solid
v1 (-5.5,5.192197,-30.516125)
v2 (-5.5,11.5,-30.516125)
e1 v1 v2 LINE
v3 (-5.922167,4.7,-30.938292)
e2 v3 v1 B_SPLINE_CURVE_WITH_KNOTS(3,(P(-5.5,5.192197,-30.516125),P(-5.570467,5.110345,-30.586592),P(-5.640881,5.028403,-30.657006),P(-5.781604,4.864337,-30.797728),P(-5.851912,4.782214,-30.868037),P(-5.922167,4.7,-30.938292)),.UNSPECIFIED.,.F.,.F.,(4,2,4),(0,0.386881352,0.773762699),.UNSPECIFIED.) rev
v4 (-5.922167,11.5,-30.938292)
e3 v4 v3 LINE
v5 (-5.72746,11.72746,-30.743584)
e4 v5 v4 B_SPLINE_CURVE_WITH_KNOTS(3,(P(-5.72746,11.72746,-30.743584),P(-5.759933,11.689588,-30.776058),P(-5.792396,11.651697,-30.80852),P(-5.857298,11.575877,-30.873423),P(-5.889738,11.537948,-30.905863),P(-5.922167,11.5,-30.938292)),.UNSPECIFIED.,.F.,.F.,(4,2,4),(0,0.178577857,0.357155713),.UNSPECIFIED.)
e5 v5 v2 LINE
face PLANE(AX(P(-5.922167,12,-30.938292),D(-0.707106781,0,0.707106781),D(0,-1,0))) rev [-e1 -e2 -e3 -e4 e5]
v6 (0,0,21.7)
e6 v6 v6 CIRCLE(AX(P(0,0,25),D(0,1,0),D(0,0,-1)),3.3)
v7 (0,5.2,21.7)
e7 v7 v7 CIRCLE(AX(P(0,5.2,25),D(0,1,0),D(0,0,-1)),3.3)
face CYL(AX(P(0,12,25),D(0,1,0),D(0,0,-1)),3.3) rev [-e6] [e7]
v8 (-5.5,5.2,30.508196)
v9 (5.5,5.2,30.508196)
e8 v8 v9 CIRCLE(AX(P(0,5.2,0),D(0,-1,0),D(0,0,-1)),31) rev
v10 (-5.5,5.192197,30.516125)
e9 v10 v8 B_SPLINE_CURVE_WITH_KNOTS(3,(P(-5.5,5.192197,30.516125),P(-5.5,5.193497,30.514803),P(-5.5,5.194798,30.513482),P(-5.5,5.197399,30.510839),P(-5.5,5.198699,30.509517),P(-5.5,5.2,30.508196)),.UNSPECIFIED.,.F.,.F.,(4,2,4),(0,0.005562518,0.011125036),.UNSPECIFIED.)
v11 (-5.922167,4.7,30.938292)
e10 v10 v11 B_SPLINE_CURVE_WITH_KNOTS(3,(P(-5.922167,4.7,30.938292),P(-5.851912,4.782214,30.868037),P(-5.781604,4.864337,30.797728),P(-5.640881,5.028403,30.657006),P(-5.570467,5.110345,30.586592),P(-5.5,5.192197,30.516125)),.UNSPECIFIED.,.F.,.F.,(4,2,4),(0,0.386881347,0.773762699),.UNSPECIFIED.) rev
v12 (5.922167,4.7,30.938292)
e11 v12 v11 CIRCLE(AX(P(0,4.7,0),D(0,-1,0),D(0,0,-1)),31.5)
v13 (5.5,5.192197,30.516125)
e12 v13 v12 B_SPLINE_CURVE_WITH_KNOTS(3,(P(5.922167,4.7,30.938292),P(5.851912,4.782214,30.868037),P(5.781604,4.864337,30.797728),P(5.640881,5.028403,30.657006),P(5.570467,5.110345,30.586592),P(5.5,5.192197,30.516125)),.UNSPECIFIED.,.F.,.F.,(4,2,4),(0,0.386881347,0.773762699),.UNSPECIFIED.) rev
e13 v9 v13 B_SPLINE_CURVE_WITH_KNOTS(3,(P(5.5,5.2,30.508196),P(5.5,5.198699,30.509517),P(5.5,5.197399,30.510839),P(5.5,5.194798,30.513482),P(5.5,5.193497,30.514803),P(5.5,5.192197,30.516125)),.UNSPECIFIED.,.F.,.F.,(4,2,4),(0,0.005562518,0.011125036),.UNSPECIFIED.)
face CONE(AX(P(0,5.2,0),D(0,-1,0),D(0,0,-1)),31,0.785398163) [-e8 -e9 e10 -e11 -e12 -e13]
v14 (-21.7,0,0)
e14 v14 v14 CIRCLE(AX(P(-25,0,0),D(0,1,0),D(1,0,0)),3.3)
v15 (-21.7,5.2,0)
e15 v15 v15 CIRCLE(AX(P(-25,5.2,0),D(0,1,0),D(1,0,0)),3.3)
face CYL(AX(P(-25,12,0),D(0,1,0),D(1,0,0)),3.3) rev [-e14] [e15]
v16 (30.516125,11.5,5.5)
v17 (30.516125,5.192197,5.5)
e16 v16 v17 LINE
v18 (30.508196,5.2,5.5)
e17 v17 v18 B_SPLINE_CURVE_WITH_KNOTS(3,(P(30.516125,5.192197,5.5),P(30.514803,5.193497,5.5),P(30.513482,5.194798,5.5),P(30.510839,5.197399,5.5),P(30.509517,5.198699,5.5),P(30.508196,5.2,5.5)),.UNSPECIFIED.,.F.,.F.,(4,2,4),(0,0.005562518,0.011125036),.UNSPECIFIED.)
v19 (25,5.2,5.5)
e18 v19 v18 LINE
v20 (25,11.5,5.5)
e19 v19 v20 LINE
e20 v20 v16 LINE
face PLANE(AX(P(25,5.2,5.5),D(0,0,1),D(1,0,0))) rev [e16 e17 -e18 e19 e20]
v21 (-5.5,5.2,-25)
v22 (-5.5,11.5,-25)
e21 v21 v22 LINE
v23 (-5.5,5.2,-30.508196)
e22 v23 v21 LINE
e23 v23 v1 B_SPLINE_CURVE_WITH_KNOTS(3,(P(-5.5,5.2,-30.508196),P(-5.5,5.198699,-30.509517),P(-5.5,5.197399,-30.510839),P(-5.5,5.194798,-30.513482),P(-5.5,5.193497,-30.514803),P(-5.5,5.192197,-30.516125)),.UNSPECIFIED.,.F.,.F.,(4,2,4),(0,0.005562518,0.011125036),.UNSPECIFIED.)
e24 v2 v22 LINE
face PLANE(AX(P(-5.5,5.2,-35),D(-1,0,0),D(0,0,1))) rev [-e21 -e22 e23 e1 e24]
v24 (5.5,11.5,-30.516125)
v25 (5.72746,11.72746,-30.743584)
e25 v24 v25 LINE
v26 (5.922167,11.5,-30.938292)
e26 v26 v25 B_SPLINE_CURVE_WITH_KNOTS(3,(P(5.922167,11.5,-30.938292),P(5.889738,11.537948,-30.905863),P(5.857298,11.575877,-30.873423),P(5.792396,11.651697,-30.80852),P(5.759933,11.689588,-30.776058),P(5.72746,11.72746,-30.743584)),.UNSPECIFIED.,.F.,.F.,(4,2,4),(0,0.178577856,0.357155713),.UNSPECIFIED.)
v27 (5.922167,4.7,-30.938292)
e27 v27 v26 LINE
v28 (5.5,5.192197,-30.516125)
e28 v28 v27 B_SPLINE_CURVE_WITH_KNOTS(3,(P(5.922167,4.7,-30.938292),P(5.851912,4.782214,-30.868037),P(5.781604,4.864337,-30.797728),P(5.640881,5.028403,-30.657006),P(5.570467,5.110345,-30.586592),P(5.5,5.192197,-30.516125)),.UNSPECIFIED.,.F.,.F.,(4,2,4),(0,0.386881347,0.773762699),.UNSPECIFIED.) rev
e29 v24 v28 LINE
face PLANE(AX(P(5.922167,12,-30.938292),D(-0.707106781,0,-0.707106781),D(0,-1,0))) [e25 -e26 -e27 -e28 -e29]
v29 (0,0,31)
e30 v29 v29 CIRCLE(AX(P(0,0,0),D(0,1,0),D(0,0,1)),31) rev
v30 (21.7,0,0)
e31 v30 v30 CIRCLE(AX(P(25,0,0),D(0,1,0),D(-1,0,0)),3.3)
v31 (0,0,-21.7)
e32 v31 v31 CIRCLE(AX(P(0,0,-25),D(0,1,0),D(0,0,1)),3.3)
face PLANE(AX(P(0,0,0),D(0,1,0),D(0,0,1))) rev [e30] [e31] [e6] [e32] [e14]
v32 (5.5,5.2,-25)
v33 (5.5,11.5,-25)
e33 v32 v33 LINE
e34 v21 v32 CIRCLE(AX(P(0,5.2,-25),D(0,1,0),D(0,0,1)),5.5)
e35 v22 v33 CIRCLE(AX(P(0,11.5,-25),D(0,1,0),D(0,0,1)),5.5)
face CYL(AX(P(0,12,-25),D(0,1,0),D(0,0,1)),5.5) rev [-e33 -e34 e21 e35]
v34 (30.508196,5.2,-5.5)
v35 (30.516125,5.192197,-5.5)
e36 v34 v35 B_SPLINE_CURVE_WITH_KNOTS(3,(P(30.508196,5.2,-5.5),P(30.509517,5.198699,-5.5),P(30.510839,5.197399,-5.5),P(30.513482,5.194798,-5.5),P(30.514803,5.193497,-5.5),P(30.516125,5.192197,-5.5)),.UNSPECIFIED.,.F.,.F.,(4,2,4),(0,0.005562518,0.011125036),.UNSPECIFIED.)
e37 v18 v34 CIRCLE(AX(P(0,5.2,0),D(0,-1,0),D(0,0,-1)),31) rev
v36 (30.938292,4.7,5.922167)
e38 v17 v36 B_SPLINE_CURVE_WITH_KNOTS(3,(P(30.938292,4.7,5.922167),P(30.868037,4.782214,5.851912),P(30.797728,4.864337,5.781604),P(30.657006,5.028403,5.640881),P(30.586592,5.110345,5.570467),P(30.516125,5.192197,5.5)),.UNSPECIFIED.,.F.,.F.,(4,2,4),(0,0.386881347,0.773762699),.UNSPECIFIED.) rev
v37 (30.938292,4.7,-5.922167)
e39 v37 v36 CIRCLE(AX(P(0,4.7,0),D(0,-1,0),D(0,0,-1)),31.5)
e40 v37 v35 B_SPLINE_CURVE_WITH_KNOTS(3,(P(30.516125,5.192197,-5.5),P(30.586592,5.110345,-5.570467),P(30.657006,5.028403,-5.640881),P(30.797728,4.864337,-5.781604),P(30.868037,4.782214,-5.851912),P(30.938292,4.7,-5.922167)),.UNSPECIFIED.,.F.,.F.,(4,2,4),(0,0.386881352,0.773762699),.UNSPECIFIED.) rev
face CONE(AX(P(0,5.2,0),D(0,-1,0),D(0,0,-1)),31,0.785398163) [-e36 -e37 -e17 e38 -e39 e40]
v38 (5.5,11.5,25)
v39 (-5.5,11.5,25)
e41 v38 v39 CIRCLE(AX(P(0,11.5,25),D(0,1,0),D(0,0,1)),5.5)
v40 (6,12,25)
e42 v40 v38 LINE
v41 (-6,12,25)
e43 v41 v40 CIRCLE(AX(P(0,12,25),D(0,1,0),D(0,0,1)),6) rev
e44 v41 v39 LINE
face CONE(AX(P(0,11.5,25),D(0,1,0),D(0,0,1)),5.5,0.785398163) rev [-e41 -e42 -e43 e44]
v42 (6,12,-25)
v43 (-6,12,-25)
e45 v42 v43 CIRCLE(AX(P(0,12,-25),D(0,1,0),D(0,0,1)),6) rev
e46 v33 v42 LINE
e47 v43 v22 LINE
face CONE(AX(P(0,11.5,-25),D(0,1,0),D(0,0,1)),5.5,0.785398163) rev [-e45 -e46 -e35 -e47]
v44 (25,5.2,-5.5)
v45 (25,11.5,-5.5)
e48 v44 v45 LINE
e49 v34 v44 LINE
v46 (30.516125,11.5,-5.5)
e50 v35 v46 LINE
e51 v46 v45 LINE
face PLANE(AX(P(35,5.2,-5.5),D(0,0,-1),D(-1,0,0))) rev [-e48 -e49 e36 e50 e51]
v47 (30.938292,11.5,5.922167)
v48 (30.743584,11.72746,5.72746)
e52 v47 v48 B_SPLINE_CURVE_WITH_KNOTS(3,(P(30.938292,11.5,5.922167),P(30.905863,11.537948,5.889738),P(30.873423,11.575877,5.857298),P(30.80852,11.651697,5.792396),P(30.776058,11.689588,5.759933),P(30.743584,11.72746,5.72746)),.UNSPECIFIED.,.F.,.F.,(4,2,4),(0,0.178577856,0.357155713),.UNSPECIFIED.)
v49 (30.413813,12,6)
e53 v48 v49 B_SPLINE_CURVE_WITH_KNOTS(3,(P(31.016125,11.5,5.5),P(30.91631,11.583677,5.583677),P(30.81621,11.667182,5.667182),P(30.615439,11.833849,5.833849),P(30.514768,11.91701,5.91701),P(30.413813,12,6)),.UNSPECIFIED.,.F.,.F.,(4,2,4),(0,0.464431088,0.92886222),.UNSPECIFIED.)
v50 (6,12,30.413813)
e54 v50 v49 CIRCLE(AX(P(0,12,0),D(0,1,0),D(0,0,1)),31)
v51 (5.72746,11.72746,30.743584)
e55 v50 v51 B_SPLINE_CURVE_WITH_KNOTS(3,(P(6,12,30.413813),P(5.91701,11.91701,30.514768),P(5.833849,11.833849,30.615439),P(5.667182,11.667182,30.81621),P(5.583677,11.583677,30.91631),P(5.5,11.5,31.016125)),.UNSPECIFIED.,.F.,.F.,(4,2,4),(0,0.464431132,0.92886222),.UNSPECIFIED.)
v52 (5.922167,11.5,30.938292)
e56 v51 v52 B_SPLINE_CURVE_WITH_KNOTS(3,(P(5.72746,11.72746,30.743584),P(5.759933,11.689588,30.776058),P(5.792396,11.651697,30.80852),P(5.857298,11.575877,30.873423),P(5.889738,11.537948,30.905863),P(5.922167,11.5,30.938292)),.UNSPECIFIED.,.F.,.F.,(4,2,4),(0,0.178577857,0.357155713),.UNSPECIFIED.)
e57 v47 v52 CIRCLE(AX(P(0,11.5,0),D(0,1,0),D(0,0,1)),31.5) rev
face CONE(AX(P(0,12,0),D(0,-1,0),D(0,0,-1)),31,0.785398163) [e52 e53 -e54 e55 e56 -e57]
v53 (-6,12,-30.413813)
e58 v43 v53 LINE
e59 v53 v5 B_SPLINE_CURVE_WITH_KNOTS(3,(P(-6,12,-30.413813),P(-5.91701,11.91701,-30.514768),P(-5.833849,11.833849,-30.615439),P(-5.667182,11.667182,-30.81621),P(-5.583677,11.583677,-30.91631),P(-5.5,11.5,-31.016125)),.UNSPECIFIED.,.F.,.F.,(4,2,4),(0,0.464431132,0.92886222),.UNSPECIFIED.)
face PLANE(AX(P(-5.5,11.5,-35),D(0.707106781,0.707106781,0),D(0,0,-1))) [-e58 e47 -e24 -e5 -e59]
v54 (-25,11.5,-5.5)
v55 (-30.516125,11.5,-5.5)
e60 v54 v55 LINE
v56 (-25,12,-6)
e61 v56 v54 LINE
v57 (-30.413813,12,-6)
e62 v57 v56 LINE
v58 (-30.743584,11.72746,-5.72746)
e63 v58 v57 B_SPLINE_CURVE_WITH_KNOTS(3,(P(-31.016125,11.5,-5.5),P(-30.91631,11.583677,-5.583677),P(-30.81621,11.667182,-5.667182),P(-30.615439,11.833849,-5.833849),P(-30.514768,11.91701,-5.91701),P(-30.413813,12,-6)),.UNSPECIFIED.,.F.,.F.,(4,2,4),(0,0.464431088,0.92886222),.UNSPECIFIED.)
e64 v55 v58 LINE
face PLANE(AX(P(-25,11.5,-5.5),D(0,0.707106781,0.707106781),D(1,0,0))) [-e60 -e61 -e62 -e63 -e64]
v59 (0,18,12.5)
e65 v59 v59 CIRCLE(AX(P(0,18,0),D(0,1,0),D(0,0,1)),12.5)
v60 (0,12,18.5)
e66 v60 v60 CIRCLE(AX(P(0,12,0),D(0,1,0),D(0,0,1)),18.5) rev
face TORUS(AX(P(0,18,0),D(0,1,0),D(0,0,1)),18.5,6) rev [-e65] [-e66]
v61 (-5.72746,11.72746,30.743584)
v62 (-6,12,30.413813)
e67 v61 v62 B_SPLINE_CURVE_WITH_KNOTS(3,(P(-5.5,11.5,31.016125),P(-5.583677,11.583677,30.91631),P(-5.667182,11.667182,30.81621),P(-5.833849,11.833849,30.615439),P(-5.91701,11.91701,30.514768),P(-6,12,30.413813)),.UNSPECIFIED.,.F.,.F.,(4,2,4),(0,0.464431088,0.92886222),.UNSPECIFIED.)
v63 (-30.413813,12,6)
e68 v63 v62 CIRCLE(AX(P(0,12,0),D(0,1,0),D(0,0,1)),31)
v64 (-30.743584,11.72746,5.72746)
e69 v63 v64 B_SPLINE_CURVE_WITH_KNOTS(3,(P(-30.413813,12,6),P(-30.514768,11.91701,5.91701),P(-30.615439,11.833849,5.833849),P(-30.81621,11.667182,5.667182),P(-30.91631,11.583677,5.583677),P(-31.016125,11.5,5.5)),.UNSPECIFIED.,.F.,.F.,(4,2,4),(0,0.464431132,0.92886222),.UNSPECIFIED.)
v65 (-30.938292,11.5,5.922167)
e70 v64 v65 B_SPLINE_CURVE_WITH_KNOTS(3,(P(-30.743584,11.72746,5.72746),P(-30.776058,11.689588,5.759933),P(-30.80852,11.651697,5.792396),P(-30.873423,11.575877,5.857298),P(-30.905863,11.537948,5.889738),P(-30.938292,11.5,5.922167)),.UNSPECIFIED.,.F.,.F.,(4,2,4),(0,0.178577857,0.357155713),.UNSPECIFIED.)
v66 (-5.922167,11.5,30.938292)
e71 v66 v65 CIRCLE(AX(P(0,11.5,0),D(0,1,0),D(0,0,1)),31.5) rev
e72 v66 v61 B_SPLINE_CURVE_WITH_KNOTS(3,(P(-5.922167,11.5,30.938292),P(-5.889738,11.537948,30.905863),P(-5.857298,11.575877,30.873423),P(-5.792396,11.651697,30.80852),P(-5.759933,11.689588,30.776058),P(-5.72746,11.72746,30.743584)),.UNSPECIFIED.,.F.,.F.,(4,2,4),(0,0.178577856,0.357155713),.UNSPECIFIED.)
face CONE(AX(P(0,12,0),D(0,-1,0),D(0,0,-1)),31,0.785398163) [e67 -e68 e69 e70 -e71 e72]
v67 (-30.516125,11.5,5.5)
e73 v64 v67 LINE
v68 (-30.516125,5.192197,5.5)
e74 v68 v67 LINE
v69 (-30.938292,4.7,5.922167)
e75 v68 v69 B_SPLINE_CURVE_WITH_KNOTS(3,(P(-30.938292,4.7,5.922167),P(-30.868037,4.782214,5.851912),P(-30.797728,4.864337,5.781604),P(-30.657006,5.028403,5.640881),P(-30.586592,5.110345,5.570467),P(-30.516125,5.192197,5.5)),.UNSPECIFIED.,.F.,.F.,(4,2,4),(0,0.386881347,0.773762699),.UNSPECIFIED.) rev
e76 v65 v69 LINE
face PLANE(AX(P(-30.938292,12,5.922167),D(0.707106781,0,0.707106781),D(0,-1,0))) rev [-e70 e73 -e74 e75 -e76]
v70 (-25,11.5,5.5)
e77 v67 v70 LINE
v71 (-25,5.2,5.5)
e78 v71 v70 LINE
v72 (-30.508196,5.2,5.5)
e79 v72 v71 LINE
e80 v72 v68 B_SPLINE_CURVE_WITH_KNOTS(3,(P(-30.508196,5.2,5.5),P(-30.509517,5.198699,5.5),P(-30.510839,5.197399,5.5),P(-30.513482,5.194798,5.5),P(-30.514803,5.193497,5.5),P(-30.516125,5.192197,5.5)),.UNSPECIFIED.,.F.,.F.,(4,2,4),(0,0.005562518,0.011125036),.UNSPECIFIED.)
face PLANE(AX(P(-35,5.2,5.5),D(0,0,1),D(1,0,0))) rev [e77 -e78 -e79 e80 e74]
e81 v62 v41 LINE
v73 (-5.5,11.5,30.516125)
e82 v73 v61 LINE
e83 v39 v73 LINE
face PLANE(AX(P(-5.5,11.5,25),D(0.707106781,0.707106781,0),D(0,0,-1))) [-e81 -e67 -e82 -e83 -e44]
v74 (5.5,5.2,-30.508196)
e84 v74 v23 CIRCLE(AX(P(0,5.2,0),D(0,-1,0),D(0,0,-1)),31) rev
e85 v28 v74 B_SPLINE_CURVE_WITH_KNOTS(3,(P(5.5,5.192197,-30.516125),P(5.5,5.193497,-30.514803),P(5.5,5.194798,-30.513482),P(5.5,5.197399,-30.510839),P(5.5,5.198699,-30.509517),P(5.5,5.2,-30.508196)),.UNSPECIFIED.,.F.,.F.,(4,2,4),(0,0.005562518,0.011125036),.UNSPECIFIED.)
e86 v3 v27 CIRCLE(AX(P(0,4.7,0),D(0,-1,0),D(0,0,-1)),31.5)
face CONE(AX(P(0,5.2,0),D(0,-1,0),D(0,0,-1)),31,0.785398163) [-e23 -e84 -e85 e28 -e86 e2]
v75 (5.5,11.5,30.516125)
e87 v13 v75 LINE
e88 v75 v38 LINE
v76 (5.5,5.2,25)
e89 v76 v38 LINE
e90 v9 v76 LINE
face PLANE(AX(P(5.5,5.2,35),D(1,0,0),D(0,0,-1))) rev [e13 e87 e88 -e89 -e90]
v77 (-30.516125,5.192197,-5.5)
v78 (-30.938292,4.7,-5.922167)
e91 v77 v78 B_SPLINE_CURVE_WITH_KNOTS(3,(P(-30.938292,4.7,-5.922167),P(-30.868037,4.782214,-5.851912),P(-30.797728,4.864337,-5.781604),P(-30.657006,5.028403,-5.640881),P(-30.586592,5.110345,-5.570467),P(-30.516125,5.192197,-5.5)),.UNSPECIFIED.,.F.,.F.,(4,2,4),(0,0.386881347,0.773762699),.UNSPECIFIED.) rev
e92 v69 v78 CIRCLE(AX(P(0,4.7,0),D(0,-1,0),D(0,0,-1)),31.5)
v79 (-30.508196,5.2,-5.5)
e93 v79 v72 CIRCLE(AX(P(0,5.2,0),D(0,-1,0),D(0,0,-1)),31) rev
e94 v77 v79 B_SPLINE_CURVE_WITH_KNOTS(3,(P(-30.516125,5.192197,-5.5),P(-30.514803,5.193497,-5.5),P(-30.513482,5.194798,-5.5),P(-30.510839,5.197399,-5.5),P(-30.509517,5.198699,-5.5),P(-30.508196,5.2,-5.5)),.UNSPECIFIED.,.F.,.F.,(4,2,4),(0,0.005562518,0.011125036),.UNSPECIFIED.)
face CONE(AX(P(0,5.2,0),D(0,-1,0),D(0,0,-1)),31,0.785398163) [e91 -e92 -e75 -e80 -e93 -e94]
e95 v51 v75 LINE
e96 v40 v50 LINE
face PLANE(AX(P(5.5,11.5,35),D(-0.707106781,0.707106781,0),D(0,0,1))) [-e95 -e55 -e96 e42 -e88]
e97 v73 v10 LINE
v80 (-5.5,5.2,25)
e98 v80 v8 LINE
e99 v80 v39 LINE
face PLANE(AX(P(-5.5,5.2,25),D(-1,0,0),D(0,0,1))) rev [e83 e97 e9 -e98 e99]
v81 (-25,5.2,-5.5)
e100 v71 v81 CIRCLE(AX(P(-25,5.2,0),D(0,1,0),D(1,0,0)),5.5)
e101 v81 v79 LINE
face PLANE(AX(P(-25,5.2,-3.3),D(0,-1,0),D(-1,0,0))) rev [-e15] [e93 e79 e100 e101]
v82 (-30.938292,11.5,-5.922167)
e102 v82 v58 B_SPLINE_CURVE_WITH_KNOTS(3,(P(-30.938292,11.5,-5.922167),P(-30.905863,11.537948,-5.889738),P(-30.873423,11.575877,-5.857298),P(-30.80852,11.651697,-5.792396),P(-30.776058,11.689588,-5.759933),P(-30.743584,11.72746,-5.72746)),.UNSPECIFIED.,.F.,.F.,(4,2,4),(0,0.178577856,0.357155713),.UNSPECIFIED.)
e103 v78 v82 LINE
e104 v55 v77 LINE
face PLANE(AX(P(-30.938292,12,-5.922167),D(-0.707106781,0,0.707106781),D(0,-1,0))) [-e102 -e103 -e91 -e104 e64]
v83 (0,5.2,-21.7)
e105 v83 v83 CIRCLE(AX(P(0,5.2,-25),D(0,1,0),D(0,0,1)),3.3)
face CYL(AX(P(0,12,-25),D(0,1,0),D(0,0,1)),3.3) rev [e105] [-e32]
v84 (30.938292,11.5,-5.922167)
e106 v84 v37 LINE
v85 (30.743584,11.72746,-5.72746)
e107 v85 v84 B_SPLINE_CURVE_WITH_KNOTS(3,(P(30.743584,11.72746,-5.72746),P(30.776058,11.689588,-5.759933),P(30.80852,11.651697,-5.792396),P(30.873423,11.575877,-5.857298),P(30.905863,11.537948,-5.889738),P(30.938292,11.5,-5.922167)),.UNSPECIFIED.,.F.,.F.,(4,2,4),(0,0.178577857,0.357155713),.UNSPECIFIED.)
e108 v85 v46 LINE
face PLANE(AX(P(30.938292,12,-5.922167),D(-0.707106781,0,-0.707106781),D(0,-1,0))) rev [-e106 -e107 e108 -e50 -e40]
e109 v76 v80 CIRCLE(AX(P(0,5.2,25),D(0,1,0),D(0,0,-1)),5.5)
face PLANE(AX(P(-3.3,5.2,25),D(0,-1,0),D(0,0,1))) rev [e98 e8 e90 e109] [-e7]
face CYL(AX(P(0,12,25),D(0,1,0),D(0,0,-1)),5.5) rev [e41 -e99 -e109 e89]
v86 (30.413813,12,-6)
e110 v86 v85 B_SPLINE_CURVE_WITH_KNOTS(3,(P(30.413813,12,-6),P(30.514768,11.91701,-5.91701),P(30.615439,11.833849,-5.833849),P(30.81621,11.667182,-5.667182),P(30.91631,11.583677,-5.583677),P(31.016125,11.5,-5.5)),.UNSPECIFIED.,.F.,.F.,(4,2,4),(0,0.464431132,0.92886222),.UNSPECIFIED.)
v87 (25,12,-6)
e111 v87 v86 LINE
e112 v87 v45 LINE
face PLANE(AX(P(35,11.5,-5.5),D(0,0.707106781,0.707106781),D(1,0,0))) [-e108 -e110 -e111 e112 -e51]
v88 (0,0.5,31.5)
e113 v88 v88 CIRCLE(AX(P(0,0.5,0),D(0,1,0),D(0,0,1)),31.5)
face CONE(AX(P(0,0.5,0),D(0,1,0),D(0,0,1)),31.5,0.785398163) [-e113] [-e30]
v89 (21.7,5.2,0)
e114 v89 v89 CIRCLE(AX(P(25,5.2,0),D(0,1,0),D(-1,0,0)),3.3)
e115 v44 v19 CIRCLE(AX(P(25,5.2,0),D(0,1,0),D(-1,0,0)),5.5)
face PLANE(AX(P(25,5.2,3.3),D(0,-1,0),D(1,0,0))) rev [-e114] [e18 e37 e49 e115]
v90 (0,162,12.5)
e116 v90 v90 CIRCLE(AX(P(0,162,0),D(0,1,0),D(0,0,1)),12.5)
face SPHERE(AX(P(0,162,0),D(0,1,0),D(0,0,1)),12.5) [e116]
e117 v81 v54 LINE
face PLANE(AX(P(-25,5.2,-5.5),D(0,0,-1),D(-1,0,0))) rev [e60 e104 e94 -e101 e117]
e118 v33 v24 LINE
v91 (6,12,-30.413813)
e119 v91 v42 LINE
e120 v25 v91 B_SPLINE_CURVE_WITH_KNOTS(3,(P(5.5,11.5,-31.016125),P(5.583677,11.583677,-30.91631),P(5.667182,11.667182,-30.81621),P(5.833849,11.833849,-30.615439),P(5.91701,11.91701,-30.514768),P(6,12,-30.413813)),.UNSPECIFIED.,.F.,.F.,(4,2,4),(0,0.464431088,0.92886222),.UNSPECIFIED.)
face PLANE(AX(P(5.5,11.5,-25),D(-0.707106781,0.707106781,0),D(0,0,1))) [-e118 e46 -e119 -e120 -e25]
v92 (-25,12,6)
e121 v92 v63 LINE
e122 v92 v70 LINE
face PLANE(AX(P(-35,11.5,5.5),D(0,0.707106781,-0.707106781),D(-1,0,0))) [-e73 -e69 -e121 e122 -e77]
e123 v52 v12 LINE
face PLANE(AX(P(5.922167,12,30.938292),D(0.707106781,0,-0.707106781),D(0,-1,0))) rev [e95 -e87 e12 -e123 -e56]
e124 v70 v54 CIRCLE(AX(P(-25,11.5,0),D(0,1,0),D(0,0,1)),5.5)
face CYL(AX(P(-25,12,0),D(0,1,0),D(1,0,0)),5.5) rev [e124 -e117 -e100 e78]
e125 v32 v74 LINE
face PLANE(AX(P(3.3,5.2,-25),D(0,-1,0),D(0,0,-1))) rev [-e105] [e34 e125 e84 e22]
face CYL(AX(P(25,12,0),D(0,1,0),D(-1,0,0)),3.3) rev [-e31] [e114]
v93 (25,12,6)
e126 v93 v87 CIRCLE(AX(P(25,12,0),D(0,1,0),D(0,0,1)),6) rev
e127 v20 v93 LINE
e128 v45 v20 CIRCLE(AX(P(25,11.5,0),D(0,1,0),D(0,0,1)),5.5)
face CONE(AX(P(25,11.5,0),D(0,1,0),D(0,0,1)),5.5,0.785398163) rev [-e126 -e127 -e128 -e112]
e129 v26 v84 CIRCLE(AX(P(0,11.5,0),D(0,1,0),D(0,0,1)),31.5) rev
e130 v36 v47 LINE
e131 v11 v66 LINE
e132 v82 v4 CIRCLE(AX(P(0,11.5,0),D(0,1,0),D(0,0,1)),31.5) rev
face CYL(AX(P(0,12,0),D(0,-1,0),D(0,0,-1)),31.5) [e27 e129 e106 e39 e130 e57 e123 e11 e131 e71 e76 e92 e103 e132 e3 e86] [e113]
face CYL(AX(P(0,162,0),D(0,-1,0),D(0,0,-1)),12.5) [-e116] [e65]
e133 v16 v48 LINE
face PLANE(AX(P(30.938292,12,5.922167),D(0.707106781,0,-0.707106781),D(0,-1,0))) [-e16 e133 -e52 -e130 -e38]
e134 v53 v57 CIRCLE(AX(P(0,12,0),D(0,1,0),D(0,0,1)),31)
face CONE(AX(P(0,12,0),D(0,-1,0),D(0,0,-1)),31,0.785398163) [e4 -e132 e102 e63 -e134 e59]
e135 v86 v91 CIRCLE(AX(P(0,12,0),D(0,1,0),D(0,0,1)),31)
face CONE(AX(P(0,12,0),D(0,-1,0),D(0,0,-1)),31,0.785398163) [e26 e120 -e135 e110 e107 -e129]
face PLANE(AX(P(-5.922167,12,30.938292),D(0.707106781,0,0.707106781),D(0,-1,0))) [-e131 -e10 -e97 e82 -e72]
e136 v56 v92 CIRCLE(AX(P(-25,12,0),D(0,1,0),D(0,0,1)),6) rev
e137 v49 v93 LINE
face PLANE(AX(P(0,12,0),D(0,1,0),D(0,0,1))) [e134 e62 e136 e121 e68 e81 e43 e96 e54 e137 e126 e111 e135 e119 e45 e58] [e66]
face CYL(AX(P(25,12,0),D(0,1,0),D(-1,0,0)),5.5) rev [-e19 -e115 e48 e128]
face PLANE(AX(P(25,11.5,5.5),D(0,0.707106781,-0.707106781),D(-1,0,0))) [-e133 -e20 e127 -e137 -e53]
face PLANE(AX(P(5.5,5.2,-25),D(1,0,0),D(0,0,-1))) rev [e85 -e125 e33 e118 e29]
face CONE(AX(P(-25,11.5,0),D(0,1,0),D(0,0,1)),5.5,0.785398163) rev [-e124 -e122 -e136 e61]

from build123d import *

# Parameters (mm, degrees)
SKETCH_1_R                = 31.5
EXTRUDE_1_DEPTH           = 12
HOLE_WIZARD_5_D           = 6.6
HOLE_WIZARD_5_CBORE_D     = 11
HOLE_WIZARD_5_CBORE_DEPTH = 6.8
PATTERN_CIRCULAR_2_COUNT  = 4
CHAMFER_2_SIZE            = 0.5
SKETCH_15_R               = 12.5
EXTRUDE_2_DEPTH           = 150
FILLET_2_R                = 6
SKETCH_18_W               = 11
SKETCH_18_H               = 10
SKETCH_18_W_2             = 10
SKETCH_18_H_2             = 11
CUT_EXTRUDE_1_DEPTH       = 6.8
CHAMFER_3_SIZE            = 0.5


with BuildPart() as part:
    # 草图1 → 凸台-拉伸1 (new body)
    with BuildSketch(Plane(origin=(0, 0, 0), x_dir=(1, 0, 0), z_dir=(0, 1, 0))):
        with Locations(Location((0, 0, 0), (0, 0, 270))):
            Circle(SKETCH_1_R)
    extrude(amount=EXTRUDE_1_DEPTH)

    # 打孔尺寸(%根据)内六角圆柱头螺钉的类型5 (through all)
    with Locations(Plane(origin=(0, 12, 0), x_dir=(1, 0, 0), z_dir=(0, 1, 0))):
        with Locations((0, 25)):
            hole_wizard_5 = CounterBoreHole(HOLE_WIZARD_5_D / 2, HOLE_WIZARD_5_CBORE_D / 2, HOLE_WIZARD_5_CBORE_DEPTH)

    # 阵列(圆周)2: 打孔尺寸(%根据)内六角圆柱头螺钉的类型5 ×4 about axis
    pattern_circular_2_axis = Axis((0, 0, 0), (0, 1, 0))
    for i in range(1, PATTERN_CIRCULAR_2_COUNT):
        add(hole_wizard_5.rotate(pattern_circular_2_axis, i * 360 / PATTERN_CIRCULAR_2_COUNT), mode=Mode.SUBTRACT)

    # 倒角2
    chamfer_2_edges = [part.edges().sort_by_distance(p)[0] for p in [
        (0, 0, -31.5),
        (0, 12, -31.5),
    ]]
    chamfer(chamfer_2_edges, length=CHAMFER_2_SIZE)

    # 草图15 → 凸台-拉伸2 (add)
    with BuildSketch(Plane(origin=(0, 12, 0), x_dir=(1, 0, 0), z_dir=(0, 1, 0))):
        with Locations(Location((0, 0, 0), (0, 0, 270))):
            Circle(SKETCH_15_R)
    extrude(amount=EXTRUDE_2_DEPTH)

    # 圆角2
    fillet_2_edges = [part.edges().sort_by_distance(p)[0] for p in [
        (0, 12, -12.5),
    ]]
    fillet(fillet_2_edges, radius=FILLET_2_R)

    # 草图17 → 旋转5 (revolve)
    with BuildSketch(Plane.XY):
        with BuildLine():
            Line((-12.5, 162), (12.5, 162))
            ThreePointArc((12.5, 162), (0, 174.5), (-12.5, 162))
        make_face()
    revolve(axis=Axis((-12.5, 162, 0), (1, 0, 0)))

    # 草图18 → 切除-拉伸1 (cut)
    with BuildSketch(Plane(origin=(0, 12, 0), x_dir=(1, 0, 0), z_dir=(0, 1, 0))):
        with Locations((0, 30)):
            Rectangle(SKETCH_18_W, SKETCH_18_H)
        with Locations((30, 0)):
            Rectangle(SKETCH_18_W_2, SKETCH_18_H_2)
        with Locations((0, -30)):
            Rectangle(SKETCH_18_W, SKETCH_18_H)
        with Locations((-30, 0)):
            Rectangle(SKETCH_18_W_2, SKETCH_18_H_2)
    extrude(amount=-CUT_EXTRUDE_1_DEPTH, mode=Mode.SUBTRACT)

    # 倒角3
    # the kernel refuses this chamfer: 0.5, 0.431316304 mm, written as the material it takes off along each edge
    with BuildSketch(Plane(origin=(0, 5.2, 0), x_dir=(-0.21464068055375052, 0, -0.9766930829341544), z_dir=(-0.9766930829341544, 0, 0.21464068055375052))) as chamfer_3_piece_1_section:
        Polygon((31.5, CHAMFER_3_SIZE), (31.5 - CHAMFER_3_SIZE, 0), (31.5, 0), align=None)
    chamfer_3_piece_1 = revolve(axis=Axis((0, 5.2, 0), (0, -1, 0)), revolution_arc=24.788895367, mode=Mode.PRIVATE)
    chamfer_3_piece_1 = split(chamfer_3_piece_1, bisect_by=Plane(origin=(-5.5, 5.2, 0), z_dir=(1, 0, 0)), keep=Keep.TOP, mode=Mode.PRIVATE)
    chamfer_3_piece_1 = split(chamfer_3_piece_1, bisect_by=Plane(origin=(5.5, 5.2, 0), z_dir=(-1, 0, 0)), keep=Keep.TOP, mode=Mode.PRIVATE)
    add(chamfer_3_piece_1, mode=Mode.SUBTRACT)
    with BuildSketch(Plane(origin=(5.5, 12, -25), x_dir=(1, 0, 0), z_dir=(0, 0, -1)), Plane(origin=(-5.5, 12, -31.794037114), x_dir=(-1, 0, 0), z_dir=(0, 0, 1)), Plane(origin=(25, 12, 5.5), x_dir=(0, 0, 1), z_dir=(1, 0, 0)), Plane(origin=(31.794037114, 12, -5.5), x_dir=(0, 0, -1), z_dir=(-1, 0, 0)), Plane(origin=(5.5, 12, 31.794037114), x_dir=(1, 0, 0), z_dir=(0, 0, -1)), Plane(origin=(-5.5, 12, 25), x_dir=(-1, 0, 0), z_dir=(0, 0, 1)), Plane(origin=(-31.794037114, 12, 5.5), x_dir=(0, 0, 1), z_dir=(1, 0, 0)), Plane(origin=(-25, 12, -5.5), x_dir=(0, 0, -1), z_dir=(-1, 0, 0))) as chamfer_3_piece_2:
        Polygon((CHAMFER_3_SIZE, 0), (0, CHAMFER_3_SIZE), (0, 0), align=None)
    extrude(amount=6.794037114, mode=Mode.SUBTRACT)
    with BuildSketch(Plane(origin=(0, 12, -25), x_dir=(-1, 0, 0), z_dir=(0, 0, -1))) as chamfer_3_piece_3:
        Polygon((5.5 + CHAMFER_3_SIZE, 0), (5.5, -CHAMFER_3_SIZE), (5.5, 0), align=None)
    revolve(axis=Axis((0, 12, -25), (0, 1, 0)), revolution_arc=180, mode=Mode.SUBTRACT)
    with BuildSketch(Plane(origin=(0, 5.2, 0), x_dir=(0.9766930829341305, 0, -0.2146406805538595), z_dir=(-0.2146406805538595, 0, -0.9766930829341305))) as chamfer_3_piece_4_section:
        Polygon((31.5, CHAMFER_3_SIZE), (31.5 - CHAMFER_3_SIZE, 0), (31.5, 0), align=None)
    chamfer_3_piece_4 = revolve(axis=Axis((0, 5.2, 0), (0, -1, 0)), revolution_arc=24.788895367, mode=Mode.PRIVATE)
    chamfer_3_piece_4 = split(chamfer_3_piece_4, bisect_by=Plane(origin=(0, 5.2, -5.5), z_dir=(0, 0, 1)), keep=Keep.TOP, mode=Mode.PRIVATE)
    chamfer_3_piece_4 = split(chamfer_3_piece_4, bisect_by=Plane(origin=(0, 5.2, 5.5), z_dir=(0, 0, -1)), keep=Keep.TOP, mode=Mode.PRIVATE)
    add(chamfer_3_piece_4, mode=Mode.SUBTRACT)
    with BuildSketch(Plane(origin=(25, 12, 0), x_dir=(0, 0, -1), z_dir=(1, 0, 0))) as chamfer_3_piece_5:
        Polygon((5.5 + CHAMFER_3_SIZE, 0), (5.5, -CHAMFER_3_SIZE), (5.5, 0), align=None)
    revolve(axis=Axis((25, 12, 0), (0, 1, 0)), revolution_arc=180, mode=Mode.SUBTRACT)
    with BuildSketch(Plane(origin=(0, 5.2, 0), x_dir=(0.21464008092789288, 0, 0.9766932147093415), z_dir=(0.9766932147093415, 0, -0.21464008092789288))) as chamfer_3_piece_6_section:
        Polygon((31.5, CHAMFER_3_SIZE), (31.5 - CHAMFER_3_SIZE, 0), (31.5, 0), align=None)
    chamfer_3_piece_6 = revolve(axis=Axis((0, 5.2, 0), (0, -1, 0)), revolution_arc=12.394412508, mode=Mode.PRIVATE)
    chamfer_3_piece_6 = split(chamfer_3_piece_6, bisect_by=Plane(origin=(5.5, 5.2, 0), z_dir=(-1, 0, 0)), keep=Keep.TOP, mode=Mode.PRIVATE)
    add(chamfer_3_piece_6, mode=Mode.SUBTRACT)
    with BuildSketch(Plane(origin=(0, 12, 25), x_dir=(1, 0, 0), z_dir=(0, 0, 1))) as chamfer_3_piece_7:
        Polygon((5.5 + CHAMFER_3_SIZE, 0), (5.5, -CHAMFER_3_SIZE), (5.5, 0), align=None)
    revolve(axis=Axis((0, 12, 25), (0, 1, 0)), revolution_arc=180, mode=Mode.SUBTRACT)
    with BuildSketch(Plane(origin=(0, 5.2, 0), x_dir=(-0.976693082934139, 0, 0.21464068055382032), z_dir=(0.21464068055382032, 0, 0.976693082934139))) as chamfer_3_piece_8_section:
        Polygon((31.5, CHAMFER_3_SIZE), (31.5 - CHAMFER_3_SIZE, 0), (31.5, 0), align=None)
    chamfer_3_piece_8 = revolve(axis=Axis((0, 5.2, 0), (0, -1, 0)), revolution_arc=24.788895367, mode=Mode.PRIVATE)
    chamfer_3_piece_8 = split(chamfer_3_piece_8, bisect_by=Plane(origin=(0, 5.2, 5.5), z_dir=(0, 0, -1)), keep=Keep.TOP, mode=Mode.PRIVATE)
    chamfer_3_piece_8 = split(chamfer_3_piece_8, bisect_by=Plane(origin=(0, 5.2, -5.5), z_dir=(0, 0, 1)), keep=Keep.TOP, mode=Mode.PRIVATE)
    add(chamfer_3_piece_8, mode=Mode.SUBTRACT)
    with BuildSketch(Plane(origin=(-25, 12, 0), x_dir=(0, 0, 1), z_dir=(-1, 0, 0))) as chamfer_3_piece_9:
        Polygon((5.5 + CHAMFER_3_SIZE, 0), (5.5, -CHAMFER_3_SIZE), (5.5, 0), align=None)
    revolve(axis=Axis((-25, 12, 0), (0, 1, 0)), revolution_arc=180, mode=Mode.SUBTRACT)
    with BuildSketch(Plane(origin=(5.5, 12.785841494, -31.016124839), x_dir=(0.9834262779301596, 0, 0.1813084550605199), z_dir=(0, -1, 0)), Plane(origin=(31.016124839, 12.785841494, 5.5), x_dir=(-0.18130845506040544, 0, 0.9834262779301808), z_dir=(0, -1, 0)), Plane(origin=(-5.5, 12.785841494, 31.016124839), x_dir=(-0.9834262779301947, 0, -0.18130845506032997), z_dir=(0, -1, 0)), Plane(origin=(-31.016124839, 12.785841494, -5.5), x_dir=(0.1813084550604473, 0, -0.9834262779301729), z_dir=(0, -1, 0))) as chamfer_3_piece_10:
        with BuildLine():
            Line((0.429282296, 0), (CHAMFER_3_SIZE * 0.181308455061, CHAMFER_3_SIZE * 0.98342627793))
            Line((CHAMFER_3_SIZE * 0.181308455061, CHAMFER_3_SIZE * 0.98342627793), (0, 0))
            ThreePointArc((0, 0), (0.220311626, -0.000730781), (0.429282296, 0))
        make_face()
    extrude(amount=7.585841494, mode=Mode.SUBTRACT)
    with BuildSketch(Plane(origin=(-5.5, 12.785841494, -31.016124839), x_dir=(-0.9834262779301588, 0, 0.18130845506052423), z_dir=(0, -1, 0)), Plane(origin=(31.016124839, 12.785841494, -5.5), x_dir=(-0.1813084550606311, 0, -0.9834262779301391), z_dir=(0, -1, 0)), Plane(origin=(5.5, 12.785841494, 31.016124839), x_dir=(0.9834262779301249, 0, -0.18130845506070803), z_dir=(0, -1, 0)), Plane(origin=(-31.016124839, 12.785841494, 5.5), x_dir=(0.18130845506059723, 0, 0.9834262779301454), z_dir=(0, -1, 0))) as chamfer_3_piece_11:
        with BuildLine():
            Line((0.429282296, 0), (CHAMFER_3_SIZE * 0.181308455061, -CHAMFER_3_SIZE * 0.98342627793))
            Line((CHAMFER_3_SIZE * 0.181308455061, -CHAMFER_3_SIZE * 0.98342627793), (0, 0))
            ThreePointArc((0, 0), (0.220311626, 0.000730781), (0.429282296, 0))
        make_face()
    extrude(amount=7.585841494, mode=Mode.SUBTRACT)
    with BuildSketch(Plane(origin=(0, 5.2, 0), x_dir=(0, 0, 1), z_dir=(1, 0, 0))) as chamfer_3_piece_12_section:
        Polygon((31.5, CHAMFER_3_SIZE), (31.5 - CHAMFER_3_SIZE, 0), (31.5, 0), align=None)
    chamfer_3_piece_12 = revolve(axis=Axis((0, 5.2, 0), (0, -1, 0)), revolution_arc=12.394412507, mode=Mode.PRIVATE)
    chamfer_3_piece_12 = split(chamfer_3_piece_12, bisect_by=Plane(origin=(-5.5, 5.2, 0), z_dir=(1, 0, 0)), keep=Keep.TOP, mode=Mode.PRIVATE)
    add(chamfer_3_piece_12, mode=Mode.SUBTRACT)
    with BuildSketch(Plane(origin=(-5.5, 12.785841494, -31.016124839), x_dir=(-0.9834262779301588, 0, 0.18130845506052423), z_dir=(0, -1, 0))) as chamfer_3_piece_13a_section:
        with BuildLine():
            Line((0.429282296, 0), (CHAMFER_3_SIZE * 0.181308455061, -CHAMFER_3_SIZE * 0.98342627793))
            Line((CHAMFER_3_SIZE * 0.181308455061, -CHAMFER_3_SIZE * 0.98342627793), (0, 0))
            ThreePointArc((0, 0), (0.220311626, 0.000730781), (0.429282296, 0))
        make_face()
    chamfer_3_piece_13a = extrude(amount=8.871682988, mode=Mode.PRIVATE)
    chamfer_3_piece_13a = split(chamfer_3_piece_13a, bisect_by=Plane(origin=(-5.5, 5.2, -31.016124839), z_dir=(0, -1, 0)), keep=Keep.TOP, mode=Mode.PRIVATE)
    with BuildSketch(Plane(origin=(0, 5.2, 0), x_dir=(-0.21464068055375052, 0, -0.9766930829341544), z_dir=(-0.9766930829341544, 0, 0.21464068055375052))) as chamfer_3_piece_13b_section:
        Polygon((31.5, CHAMFER_3_SIZE), (31.5 - CHAMFER_3_SIZE, 0), (31.5, 0), align=None)
    chamfer_3_piece_13b = revolve(axis=Axis((0, 5.2, 0), (0, -1, 0)), revolution_arc=24.788895367, mode=Mode.PRIVATE)
    chamfer_3_piece_13b = split(chamfer_3_piece_13b, bisect_by=Plane(origin=(-5.5, 5.2, 0), z_dir=(-1, 0, 0)), keep=Keep.TOP, mode=Mode.PRIVATE)
    chamfer_3_piece_13 = chamfer_3_piece_13a & chamfer_3_piece_13b
    add(chamfer_3_piece_13, mode=Mode.SUBTRACT)
    with BuildSketch(Plane(origin=(0, 5.2, 0), x_dir=(-0.21464068055375052, 0, -0.9766930829341544), z_dir=(-0.9766930829341544, 0, 0.21464068055375052))) as chamfer_3_piece_14a_section:
        Polygon((31.5, CHAMFER_3_SIZE), (31.5 - CHAMFER_3_SIZE, 0), (31.5, 0), align=None)
    chamfer_3_piece_14a = revolve(axis=Axis((0, 5.2, 0), (0, -1, 0)), revolution_arc=24.788895367, mode=Mode.PRIVATE)
    chamfer_3_piece_14a = split(chamfer_3_piece_14a, bisect_by=Plane(origin=(5.5, 5.2, 0), z_dir=(1, 0, 0)), keep=Keep.TOP, mode=Mode.PRIVATE)
    with BuildSketch(Plane(origin=(5.5, 12.785841494, -31.016124839), x_dir=(0.9834262779301596, 0, 0.1813084550605199), z_dir=(0, -1, 0))) as chamfer_3_piece_14b_section:
        with BuildLine():
            Line((0.429282296, 0), (CHAMFER_3_SIZE * 0.181308455061, CHAMFER_3_SIZE * 0.98342627793))
            Line((CHAMFER_3_SIZE * 0.181308455061, CHAMFER_3_SIZE * 0.98342627793), (0, 0))
            ThreePointArc((0, 0), (0.220311626, -0.000730781), (0.429282296, 0))
        make_face()
    chamfer_3_piece_14b = extrude(amount=8.871682988, mode=Mode.PRIVATE)
    chamfer_3_piece_14b = split(chamfer_3_piece_14b, bisect_by=Plane(origin=(5.5, 5.2, -31.016124839), z_dir=(0, -1, 0)), keep=Keep.TOP, mode=Mode.PRIVATE)
    chamfer_3_piece_14 = chamfer_3_piece_14a & chamfer_3_piece_14b
    add(chamfer_3_piece_14, mode=Mode.SUBTRACT)
    with BuildSketch(Plane(origin=(31.016124839, 12.785841494, -5.5), x_dir=(-0.1813084550606311, 0, -0.9834262779301391), z_dir=(0, -1, 0))) as chamfer_3_piece_15a_section:
        with BuildLine():
            Line((0.429282296, 0), (CHAMFER_3_SIZE * 0.181308455061, -CHAMFER_3_SIZE * 0.98342627793))
            Line((CHAMFER_3_SIZE * 0.181308455061, -CHAMFER_3_SIZE * 0.98342627793), (0, 0))
            ThreePointArc((0, 0), (0.220311626, 0.000730781), (0.429282296, 0))
        make_face()
    chamfer_3_piece_15a = extrude(amount=8.871682988, mode=Mode.PRIVATE)
    chamfer_3_piece_15a = split(chamfer_3_piece_15a, bisect_by=Plane(origin=(31.016124839, 5.2, -5.5), z_dir=(0, -1, 0)), keep=Keep.TOP, mode=Mode.PRIVATE)
    with BuildSketch(Plane(origin=(0, 5.2, 0), x_dir=(0.9766930829341305, 0, -0.2146406805538595), z_dir=(-0.2146406805538595, 0, -0.9766930829341305))) as chamfer_3_piece_15b_section:
        Polygon((31.5, CHAMFER_3_SIZE), (31.5 - CHAMFER_3_SIZE, 0), (31.5, 0), align=None)
    chamfer_3_piece_15b = revolve(axis=Axis((0, 5.2, 0), (0, -1, 0)), revolution_arc=24.788895367, mode=Mode.PRIVATE)
    chamfer_3_piece_15b = split(chamfer_3_piece_15b, bisect_by=Plane(origin=(0, 5.2, -5.5), z_dir=(0, 0, -1)), keep=Keep.TOP, mode=Mode.PRIVATE)
    chamfer_3_piece_15 = chamfer_3_piece_15a & chamfer_3_piece_15b
    add(chamfer_3_piece_15, mode=Mode.SUBTRACT)
    with BuildSketch(Plane(origin=(0, 5.2, 0), x_dir=(0.9766930829341305, 0, -0.2146406805538595), z_dir=(-0.2146406805538595, 0, -0.9766930829341305))) as chamfer_3_piece_16a_section:
        Polygon((31.5, CHAMFER_3_SIZE), (31.5 - CHAMFER_3_SIZE, 0), (31.5, 0), align=None)
    chamfer_3_piece_16a = revolve(axis=Axis((0, 5.2, 0), (0, -1, 0)), revolution_arc=24.788895367, mode=Mode.PRIVATE)
    chamfer_3_piece_16a = split(chamfer_3_piece_16a, bisect_by=Plane(origin=(0, 5.2, 5.5), z_dir=(0, 0, 1)), keep=Keep.TOP, mode=Mode.PRIVATE)
    with BuildSketch(Plane(origin=(31.016124839, 12.785841494, 5.5), x_dir=(-0.18130845506040544, 0, 0.9834262779301808), z_dir=(0, -1, 0))) as chamfer_3_piece_16b_section:
        with BuildLine():
            Line((0.429282296, 0), (CHAMFER_3_SIZE * 0.18130845506, CHAMFER_3_SIZE * 0.98342627793))
            Line((CHAMFER_3_SIZE * 0.18130845506, CHAMFER_3_SIZE * 0.98342627793), (0, 0))
            ThreePointArc((0, 0), (0.220311626, -0.000730781), (0.429282296, 0))
        make_face()
    chamfer_3_piece_16b = extrude(amount=8.871682988, mode=Mode.PRIVATE)
    chamfer_3_piece_16b = split(chamfer_3_piece_16b, bisect_by=Plane(origin=(31.016124839, 5.2, 5.5), z_dir=(0, -1, 0)), keep=Keep.TOP, mode=Mode.PRIVATE)
    chamfer_3_piece_16 = chamfer_3_piece_16a & chamfer_3_piece_16b
    add(chamfer_3_piece_16, mode=Mode.SUBTRACT)
    with BuildSketch(Plane(origin=(5.5, 12.785841494, 31.016124839), x_dir=(0.9834262779301249, 0, -0.18130845506070803), z_dir=(0, -1, 0))) as chamfer_3_piece_17a_section:
        with BuildLine():
            Line((0.429282296, 0), (CHAMFER_3_SIZE * 0.181308455061, -CHAMFER_3_SIZE * 0.98342627793))
            Line((CHAMFER_3_SIZE * 0.181308455061, -CHAMFER_3_SIZE * 0.98342627793), (0, 0))
            ThreePointArc((0, 0), (0.220311626, 0.000730781), (0.429282296, 0))
        make_face()
    chamfer_3_piece_17a = extrude(amount=8.871682988, mode=Mode.PRIVATE)
    chamfer_3_piece_17a = split(chamfer_3_piece_17a, bisect_by=Plane(origin=(5.5, 5.2, 31.016124839), z_dir=(0, -1, 0)), keep=Keep.TOP, mode=Mode.PRIVATE)
    with BuildSketch(Plane(origin=(0, 5.2, 0), x_dir=(0.21464008092789288, 0, 0.9766932147093415), z_dir=(0.9766932147093415, 0, -0.21464008092789288))) as chamfer_3_piece_17b_section:
        Polygon((31.5, CHAMFER_3_SIZE), (31.5 - CHAMFER_3_SIZE, 0), (31.5, 0), align=None)
    chamfer_3_piece_17b = revolve(axis=Axis((0, 5.2, 0), (0, -1, 0)), revolution_arc=12.394412508, mode=Mode.PRIVATE)
    chamfer_3_piece_17b = split(chamfer_3_piece_17b, bisect_by=Plane(origin=(5.5, 5.2, 0), z_dir=(1, 0, 0)), keep=Keep.TOP, mode=Mode.PRIVATE)
    chamfer_3_piece_17 = chamfer_3_piece_17a & chamfer_3_piece_17b
    add(chamfer_3_piece_17, mode=Mode.SUBTRACT)
    with BuildSketch(Plane(origin=(-31.016124839, 12.785841494, 5.5), x_dir=(0.18130845506059723, 0, 0.9834262779301454), z_dir=(0, -1, 0))) as chamfer_3_piece_18a_section:
        with BuildLine():
            Line((0.429282296, 0), (CHAMFER_3_SIZE * 0.181308455061, -CHAMFER_3_SIZE * 0.98342627793))
            Line((CHAMFER_3_SIZE * 0.181308455061, -CHAMFER_3_SIZE * 0.98342627793), (0, 0))
            ThreePointArc((0, 0), (0.220311626, 0.000730781), (0.429282296, 0))
        make_face()
    chamfer_3_piece_18a = extrude(amount=8.871682988, mode=Mode.PRIVATE)
    chamfer_3_piece_18a = split(chamfer_3_piece_18a, bisect_by=Plane(origin=(-31.016124839, 5.2, 5.5), z_dir=(0, -1, 0)), keep=Keep.TOP, mode=Mode.PRIVATE)
    with BuildSketch(Plane(origin=(0, 5.2, 0), x_dir=(-0.976693082934139, 0, 0.21464068055382032), z_dir=(0.21464068055382032, 0, 0.976693082934139))) as chamfer_3_piece_18b_section:
        Polygon((31.5, CHAMFER_3_SIZE), (31.5 - CHAMFER_3_SIZE, 0), (31.5, 0), align=None)
    chamfer_3_piece_18b = revolve(axis=Axis((0, 5.2, 0), (0, -1, 0)), revolution_arc=24.788895367, mode=Mode.PRIVATE)
    chamfer_3_piece_18b = split(chamfer_3_piece_18b, bisect_by=Plane(origin=(0, 5.2, 5.5), z_dir=(0, 0, 1)), keep=Keep.TOP, mode=Mode.PRIVATE)
    chamfer_3_piece_18 = chamfer_3_piece_18a & chamfer_3_piece_18b
    add(chamfer_3_piece_18, mode=Mode.SUBTRACT)
    with BuildSketch(Plane(origin=(0, 5.2, 0), x_dir=(-0.976693082934139, 0, 0.21464068055382032), z_dir=(0.21464068055382032, 0, 0.976693082934139))) as chamfer_3_piece_19a_section:
        Polygon((31.5, CHAMFER_3_SIZE), (31.5 - CHAMFER_3_SIZE, 0), (31.5, 0), align=None)
    chamfer_3_piece_19a = revolve(axis=Axis((0, 5.2, 0), (0, -1, 0)), revolution_arc=24.788895367, mode=Mode.PRIVATE)
    chamfer_3_piece_19a = split(chamfer_3_piece_19a, bisect_by=Plane(origin=(0, 5.2, -5.5), z_dir=(0, 0, -1)), keep=Keep.TOP, mode=Mode.PRIVATE)
    with BuildSketch(Plane(origin=(-31.016124839, 12.785841494, -5.5), x_dir=(0.1813084550604473, 0, -0.9834262779301729), z_dir=(0, -1, 0))) as chamfer_3_piece_19b_section:
        with BuildLine():
            Line((0.429282296, 0), (CHAMFER_3_SIZE * 0.18130845506, CHAMFER_3_SIZE * 0.98342627793))
            Line((CHAMFER_3_SIZE * 0.18130845506, CHAMFER_3_SIZE * 0.98342627793), (0, 0))
            ThreePointArc((0, 0), (0.220311626, -0.000730781), (0.429282296, 0))
        make_face()
    chamfer_3_piece_19b = extrude(amount=8.871682988, mode=Mode.PRIVATE)
    chamfer_3_piece_19b = split(chamfer_3_piece_19b, bisect_by=Plane(origin=(-31.016124839, 5.2, -5.5), z_dir=(0, -1, 0)), keep=Keep.TOP, mode=Mode.PRIVATE)
    chamfer_3_piece_19 = chamfer_3_piece_19a & chamfer_3_piece_19b
    add(chamfer_3_piece_19, mode=Mode.SUBTRACT)
    with BuildSketch(Plane(origin=(0, 5.2, 0), x_dir=(0, 0, 1), z_dir=(1, 0, 0))) as chamfer_3_piece_20a_section:
        Polygon((31.5, CHAMFER_3_SIZE), (31.5 - CHAMFER_3_SIZE, 0), (31.5, 0), align=None)
    chamfer_3_piece_20a = revolve(axis=Axis((0, 5.2, 0), (0, -1, 0)), revolution_arc=12.394412507, mode=Mode.PRIVATE)
    chamfer_3_piece_20a = split(chamfer_3_piece_20a, bisect_by=Plane(origin=(-5.5, 5.2, 0), z_dir=(-1, 0, 0)), keep=Keep.TOP, mode=Mode.PRIVATE)
    with BuildSketch(Plane(origin=(-5.5, 12.785841494, 31.016124839), x_dir=(-0.9834262779301947, 0, -0.18130845506032997), z_dir=(0, -1, 0))) as chamfer_3_piece_20b_section:
        with BuildLine():
            Line((0.429282296, 0), (CHAMFER_3_SIZE * 0.18130845506, CHAMFER_3_SIZE * 0.98342627793))
            Line((CHAMFER_3_SIZE * 0.18130845506, CHAMFER_3_SIZE * 0.98342627793), (0, 0))
            ThreePointArc((0, 0), (0.220311626, -0.000730781), (0.429282296, 0))
        make_face()
    chamfer_3_piece_20b = extrude(amount=8.871682988, mode=Mode.PRIVATE)
    chamfer_3_piece_20b = split(chamfer_3_piece_20b, bisect_by=Plane(origin=(-5.5, 5.2, 31.016124839), z_dir=(0, -1, 0)), keep=Keep.TOP, mode=Mode.PRIVATE)
    chamfer_3_piece_20 = chamfer_3_piece_20a & chamfer_3_piece_20b
    add(chamfer_3_piece_20, mode=Mode.SUBTRACT)


solid = part.part
